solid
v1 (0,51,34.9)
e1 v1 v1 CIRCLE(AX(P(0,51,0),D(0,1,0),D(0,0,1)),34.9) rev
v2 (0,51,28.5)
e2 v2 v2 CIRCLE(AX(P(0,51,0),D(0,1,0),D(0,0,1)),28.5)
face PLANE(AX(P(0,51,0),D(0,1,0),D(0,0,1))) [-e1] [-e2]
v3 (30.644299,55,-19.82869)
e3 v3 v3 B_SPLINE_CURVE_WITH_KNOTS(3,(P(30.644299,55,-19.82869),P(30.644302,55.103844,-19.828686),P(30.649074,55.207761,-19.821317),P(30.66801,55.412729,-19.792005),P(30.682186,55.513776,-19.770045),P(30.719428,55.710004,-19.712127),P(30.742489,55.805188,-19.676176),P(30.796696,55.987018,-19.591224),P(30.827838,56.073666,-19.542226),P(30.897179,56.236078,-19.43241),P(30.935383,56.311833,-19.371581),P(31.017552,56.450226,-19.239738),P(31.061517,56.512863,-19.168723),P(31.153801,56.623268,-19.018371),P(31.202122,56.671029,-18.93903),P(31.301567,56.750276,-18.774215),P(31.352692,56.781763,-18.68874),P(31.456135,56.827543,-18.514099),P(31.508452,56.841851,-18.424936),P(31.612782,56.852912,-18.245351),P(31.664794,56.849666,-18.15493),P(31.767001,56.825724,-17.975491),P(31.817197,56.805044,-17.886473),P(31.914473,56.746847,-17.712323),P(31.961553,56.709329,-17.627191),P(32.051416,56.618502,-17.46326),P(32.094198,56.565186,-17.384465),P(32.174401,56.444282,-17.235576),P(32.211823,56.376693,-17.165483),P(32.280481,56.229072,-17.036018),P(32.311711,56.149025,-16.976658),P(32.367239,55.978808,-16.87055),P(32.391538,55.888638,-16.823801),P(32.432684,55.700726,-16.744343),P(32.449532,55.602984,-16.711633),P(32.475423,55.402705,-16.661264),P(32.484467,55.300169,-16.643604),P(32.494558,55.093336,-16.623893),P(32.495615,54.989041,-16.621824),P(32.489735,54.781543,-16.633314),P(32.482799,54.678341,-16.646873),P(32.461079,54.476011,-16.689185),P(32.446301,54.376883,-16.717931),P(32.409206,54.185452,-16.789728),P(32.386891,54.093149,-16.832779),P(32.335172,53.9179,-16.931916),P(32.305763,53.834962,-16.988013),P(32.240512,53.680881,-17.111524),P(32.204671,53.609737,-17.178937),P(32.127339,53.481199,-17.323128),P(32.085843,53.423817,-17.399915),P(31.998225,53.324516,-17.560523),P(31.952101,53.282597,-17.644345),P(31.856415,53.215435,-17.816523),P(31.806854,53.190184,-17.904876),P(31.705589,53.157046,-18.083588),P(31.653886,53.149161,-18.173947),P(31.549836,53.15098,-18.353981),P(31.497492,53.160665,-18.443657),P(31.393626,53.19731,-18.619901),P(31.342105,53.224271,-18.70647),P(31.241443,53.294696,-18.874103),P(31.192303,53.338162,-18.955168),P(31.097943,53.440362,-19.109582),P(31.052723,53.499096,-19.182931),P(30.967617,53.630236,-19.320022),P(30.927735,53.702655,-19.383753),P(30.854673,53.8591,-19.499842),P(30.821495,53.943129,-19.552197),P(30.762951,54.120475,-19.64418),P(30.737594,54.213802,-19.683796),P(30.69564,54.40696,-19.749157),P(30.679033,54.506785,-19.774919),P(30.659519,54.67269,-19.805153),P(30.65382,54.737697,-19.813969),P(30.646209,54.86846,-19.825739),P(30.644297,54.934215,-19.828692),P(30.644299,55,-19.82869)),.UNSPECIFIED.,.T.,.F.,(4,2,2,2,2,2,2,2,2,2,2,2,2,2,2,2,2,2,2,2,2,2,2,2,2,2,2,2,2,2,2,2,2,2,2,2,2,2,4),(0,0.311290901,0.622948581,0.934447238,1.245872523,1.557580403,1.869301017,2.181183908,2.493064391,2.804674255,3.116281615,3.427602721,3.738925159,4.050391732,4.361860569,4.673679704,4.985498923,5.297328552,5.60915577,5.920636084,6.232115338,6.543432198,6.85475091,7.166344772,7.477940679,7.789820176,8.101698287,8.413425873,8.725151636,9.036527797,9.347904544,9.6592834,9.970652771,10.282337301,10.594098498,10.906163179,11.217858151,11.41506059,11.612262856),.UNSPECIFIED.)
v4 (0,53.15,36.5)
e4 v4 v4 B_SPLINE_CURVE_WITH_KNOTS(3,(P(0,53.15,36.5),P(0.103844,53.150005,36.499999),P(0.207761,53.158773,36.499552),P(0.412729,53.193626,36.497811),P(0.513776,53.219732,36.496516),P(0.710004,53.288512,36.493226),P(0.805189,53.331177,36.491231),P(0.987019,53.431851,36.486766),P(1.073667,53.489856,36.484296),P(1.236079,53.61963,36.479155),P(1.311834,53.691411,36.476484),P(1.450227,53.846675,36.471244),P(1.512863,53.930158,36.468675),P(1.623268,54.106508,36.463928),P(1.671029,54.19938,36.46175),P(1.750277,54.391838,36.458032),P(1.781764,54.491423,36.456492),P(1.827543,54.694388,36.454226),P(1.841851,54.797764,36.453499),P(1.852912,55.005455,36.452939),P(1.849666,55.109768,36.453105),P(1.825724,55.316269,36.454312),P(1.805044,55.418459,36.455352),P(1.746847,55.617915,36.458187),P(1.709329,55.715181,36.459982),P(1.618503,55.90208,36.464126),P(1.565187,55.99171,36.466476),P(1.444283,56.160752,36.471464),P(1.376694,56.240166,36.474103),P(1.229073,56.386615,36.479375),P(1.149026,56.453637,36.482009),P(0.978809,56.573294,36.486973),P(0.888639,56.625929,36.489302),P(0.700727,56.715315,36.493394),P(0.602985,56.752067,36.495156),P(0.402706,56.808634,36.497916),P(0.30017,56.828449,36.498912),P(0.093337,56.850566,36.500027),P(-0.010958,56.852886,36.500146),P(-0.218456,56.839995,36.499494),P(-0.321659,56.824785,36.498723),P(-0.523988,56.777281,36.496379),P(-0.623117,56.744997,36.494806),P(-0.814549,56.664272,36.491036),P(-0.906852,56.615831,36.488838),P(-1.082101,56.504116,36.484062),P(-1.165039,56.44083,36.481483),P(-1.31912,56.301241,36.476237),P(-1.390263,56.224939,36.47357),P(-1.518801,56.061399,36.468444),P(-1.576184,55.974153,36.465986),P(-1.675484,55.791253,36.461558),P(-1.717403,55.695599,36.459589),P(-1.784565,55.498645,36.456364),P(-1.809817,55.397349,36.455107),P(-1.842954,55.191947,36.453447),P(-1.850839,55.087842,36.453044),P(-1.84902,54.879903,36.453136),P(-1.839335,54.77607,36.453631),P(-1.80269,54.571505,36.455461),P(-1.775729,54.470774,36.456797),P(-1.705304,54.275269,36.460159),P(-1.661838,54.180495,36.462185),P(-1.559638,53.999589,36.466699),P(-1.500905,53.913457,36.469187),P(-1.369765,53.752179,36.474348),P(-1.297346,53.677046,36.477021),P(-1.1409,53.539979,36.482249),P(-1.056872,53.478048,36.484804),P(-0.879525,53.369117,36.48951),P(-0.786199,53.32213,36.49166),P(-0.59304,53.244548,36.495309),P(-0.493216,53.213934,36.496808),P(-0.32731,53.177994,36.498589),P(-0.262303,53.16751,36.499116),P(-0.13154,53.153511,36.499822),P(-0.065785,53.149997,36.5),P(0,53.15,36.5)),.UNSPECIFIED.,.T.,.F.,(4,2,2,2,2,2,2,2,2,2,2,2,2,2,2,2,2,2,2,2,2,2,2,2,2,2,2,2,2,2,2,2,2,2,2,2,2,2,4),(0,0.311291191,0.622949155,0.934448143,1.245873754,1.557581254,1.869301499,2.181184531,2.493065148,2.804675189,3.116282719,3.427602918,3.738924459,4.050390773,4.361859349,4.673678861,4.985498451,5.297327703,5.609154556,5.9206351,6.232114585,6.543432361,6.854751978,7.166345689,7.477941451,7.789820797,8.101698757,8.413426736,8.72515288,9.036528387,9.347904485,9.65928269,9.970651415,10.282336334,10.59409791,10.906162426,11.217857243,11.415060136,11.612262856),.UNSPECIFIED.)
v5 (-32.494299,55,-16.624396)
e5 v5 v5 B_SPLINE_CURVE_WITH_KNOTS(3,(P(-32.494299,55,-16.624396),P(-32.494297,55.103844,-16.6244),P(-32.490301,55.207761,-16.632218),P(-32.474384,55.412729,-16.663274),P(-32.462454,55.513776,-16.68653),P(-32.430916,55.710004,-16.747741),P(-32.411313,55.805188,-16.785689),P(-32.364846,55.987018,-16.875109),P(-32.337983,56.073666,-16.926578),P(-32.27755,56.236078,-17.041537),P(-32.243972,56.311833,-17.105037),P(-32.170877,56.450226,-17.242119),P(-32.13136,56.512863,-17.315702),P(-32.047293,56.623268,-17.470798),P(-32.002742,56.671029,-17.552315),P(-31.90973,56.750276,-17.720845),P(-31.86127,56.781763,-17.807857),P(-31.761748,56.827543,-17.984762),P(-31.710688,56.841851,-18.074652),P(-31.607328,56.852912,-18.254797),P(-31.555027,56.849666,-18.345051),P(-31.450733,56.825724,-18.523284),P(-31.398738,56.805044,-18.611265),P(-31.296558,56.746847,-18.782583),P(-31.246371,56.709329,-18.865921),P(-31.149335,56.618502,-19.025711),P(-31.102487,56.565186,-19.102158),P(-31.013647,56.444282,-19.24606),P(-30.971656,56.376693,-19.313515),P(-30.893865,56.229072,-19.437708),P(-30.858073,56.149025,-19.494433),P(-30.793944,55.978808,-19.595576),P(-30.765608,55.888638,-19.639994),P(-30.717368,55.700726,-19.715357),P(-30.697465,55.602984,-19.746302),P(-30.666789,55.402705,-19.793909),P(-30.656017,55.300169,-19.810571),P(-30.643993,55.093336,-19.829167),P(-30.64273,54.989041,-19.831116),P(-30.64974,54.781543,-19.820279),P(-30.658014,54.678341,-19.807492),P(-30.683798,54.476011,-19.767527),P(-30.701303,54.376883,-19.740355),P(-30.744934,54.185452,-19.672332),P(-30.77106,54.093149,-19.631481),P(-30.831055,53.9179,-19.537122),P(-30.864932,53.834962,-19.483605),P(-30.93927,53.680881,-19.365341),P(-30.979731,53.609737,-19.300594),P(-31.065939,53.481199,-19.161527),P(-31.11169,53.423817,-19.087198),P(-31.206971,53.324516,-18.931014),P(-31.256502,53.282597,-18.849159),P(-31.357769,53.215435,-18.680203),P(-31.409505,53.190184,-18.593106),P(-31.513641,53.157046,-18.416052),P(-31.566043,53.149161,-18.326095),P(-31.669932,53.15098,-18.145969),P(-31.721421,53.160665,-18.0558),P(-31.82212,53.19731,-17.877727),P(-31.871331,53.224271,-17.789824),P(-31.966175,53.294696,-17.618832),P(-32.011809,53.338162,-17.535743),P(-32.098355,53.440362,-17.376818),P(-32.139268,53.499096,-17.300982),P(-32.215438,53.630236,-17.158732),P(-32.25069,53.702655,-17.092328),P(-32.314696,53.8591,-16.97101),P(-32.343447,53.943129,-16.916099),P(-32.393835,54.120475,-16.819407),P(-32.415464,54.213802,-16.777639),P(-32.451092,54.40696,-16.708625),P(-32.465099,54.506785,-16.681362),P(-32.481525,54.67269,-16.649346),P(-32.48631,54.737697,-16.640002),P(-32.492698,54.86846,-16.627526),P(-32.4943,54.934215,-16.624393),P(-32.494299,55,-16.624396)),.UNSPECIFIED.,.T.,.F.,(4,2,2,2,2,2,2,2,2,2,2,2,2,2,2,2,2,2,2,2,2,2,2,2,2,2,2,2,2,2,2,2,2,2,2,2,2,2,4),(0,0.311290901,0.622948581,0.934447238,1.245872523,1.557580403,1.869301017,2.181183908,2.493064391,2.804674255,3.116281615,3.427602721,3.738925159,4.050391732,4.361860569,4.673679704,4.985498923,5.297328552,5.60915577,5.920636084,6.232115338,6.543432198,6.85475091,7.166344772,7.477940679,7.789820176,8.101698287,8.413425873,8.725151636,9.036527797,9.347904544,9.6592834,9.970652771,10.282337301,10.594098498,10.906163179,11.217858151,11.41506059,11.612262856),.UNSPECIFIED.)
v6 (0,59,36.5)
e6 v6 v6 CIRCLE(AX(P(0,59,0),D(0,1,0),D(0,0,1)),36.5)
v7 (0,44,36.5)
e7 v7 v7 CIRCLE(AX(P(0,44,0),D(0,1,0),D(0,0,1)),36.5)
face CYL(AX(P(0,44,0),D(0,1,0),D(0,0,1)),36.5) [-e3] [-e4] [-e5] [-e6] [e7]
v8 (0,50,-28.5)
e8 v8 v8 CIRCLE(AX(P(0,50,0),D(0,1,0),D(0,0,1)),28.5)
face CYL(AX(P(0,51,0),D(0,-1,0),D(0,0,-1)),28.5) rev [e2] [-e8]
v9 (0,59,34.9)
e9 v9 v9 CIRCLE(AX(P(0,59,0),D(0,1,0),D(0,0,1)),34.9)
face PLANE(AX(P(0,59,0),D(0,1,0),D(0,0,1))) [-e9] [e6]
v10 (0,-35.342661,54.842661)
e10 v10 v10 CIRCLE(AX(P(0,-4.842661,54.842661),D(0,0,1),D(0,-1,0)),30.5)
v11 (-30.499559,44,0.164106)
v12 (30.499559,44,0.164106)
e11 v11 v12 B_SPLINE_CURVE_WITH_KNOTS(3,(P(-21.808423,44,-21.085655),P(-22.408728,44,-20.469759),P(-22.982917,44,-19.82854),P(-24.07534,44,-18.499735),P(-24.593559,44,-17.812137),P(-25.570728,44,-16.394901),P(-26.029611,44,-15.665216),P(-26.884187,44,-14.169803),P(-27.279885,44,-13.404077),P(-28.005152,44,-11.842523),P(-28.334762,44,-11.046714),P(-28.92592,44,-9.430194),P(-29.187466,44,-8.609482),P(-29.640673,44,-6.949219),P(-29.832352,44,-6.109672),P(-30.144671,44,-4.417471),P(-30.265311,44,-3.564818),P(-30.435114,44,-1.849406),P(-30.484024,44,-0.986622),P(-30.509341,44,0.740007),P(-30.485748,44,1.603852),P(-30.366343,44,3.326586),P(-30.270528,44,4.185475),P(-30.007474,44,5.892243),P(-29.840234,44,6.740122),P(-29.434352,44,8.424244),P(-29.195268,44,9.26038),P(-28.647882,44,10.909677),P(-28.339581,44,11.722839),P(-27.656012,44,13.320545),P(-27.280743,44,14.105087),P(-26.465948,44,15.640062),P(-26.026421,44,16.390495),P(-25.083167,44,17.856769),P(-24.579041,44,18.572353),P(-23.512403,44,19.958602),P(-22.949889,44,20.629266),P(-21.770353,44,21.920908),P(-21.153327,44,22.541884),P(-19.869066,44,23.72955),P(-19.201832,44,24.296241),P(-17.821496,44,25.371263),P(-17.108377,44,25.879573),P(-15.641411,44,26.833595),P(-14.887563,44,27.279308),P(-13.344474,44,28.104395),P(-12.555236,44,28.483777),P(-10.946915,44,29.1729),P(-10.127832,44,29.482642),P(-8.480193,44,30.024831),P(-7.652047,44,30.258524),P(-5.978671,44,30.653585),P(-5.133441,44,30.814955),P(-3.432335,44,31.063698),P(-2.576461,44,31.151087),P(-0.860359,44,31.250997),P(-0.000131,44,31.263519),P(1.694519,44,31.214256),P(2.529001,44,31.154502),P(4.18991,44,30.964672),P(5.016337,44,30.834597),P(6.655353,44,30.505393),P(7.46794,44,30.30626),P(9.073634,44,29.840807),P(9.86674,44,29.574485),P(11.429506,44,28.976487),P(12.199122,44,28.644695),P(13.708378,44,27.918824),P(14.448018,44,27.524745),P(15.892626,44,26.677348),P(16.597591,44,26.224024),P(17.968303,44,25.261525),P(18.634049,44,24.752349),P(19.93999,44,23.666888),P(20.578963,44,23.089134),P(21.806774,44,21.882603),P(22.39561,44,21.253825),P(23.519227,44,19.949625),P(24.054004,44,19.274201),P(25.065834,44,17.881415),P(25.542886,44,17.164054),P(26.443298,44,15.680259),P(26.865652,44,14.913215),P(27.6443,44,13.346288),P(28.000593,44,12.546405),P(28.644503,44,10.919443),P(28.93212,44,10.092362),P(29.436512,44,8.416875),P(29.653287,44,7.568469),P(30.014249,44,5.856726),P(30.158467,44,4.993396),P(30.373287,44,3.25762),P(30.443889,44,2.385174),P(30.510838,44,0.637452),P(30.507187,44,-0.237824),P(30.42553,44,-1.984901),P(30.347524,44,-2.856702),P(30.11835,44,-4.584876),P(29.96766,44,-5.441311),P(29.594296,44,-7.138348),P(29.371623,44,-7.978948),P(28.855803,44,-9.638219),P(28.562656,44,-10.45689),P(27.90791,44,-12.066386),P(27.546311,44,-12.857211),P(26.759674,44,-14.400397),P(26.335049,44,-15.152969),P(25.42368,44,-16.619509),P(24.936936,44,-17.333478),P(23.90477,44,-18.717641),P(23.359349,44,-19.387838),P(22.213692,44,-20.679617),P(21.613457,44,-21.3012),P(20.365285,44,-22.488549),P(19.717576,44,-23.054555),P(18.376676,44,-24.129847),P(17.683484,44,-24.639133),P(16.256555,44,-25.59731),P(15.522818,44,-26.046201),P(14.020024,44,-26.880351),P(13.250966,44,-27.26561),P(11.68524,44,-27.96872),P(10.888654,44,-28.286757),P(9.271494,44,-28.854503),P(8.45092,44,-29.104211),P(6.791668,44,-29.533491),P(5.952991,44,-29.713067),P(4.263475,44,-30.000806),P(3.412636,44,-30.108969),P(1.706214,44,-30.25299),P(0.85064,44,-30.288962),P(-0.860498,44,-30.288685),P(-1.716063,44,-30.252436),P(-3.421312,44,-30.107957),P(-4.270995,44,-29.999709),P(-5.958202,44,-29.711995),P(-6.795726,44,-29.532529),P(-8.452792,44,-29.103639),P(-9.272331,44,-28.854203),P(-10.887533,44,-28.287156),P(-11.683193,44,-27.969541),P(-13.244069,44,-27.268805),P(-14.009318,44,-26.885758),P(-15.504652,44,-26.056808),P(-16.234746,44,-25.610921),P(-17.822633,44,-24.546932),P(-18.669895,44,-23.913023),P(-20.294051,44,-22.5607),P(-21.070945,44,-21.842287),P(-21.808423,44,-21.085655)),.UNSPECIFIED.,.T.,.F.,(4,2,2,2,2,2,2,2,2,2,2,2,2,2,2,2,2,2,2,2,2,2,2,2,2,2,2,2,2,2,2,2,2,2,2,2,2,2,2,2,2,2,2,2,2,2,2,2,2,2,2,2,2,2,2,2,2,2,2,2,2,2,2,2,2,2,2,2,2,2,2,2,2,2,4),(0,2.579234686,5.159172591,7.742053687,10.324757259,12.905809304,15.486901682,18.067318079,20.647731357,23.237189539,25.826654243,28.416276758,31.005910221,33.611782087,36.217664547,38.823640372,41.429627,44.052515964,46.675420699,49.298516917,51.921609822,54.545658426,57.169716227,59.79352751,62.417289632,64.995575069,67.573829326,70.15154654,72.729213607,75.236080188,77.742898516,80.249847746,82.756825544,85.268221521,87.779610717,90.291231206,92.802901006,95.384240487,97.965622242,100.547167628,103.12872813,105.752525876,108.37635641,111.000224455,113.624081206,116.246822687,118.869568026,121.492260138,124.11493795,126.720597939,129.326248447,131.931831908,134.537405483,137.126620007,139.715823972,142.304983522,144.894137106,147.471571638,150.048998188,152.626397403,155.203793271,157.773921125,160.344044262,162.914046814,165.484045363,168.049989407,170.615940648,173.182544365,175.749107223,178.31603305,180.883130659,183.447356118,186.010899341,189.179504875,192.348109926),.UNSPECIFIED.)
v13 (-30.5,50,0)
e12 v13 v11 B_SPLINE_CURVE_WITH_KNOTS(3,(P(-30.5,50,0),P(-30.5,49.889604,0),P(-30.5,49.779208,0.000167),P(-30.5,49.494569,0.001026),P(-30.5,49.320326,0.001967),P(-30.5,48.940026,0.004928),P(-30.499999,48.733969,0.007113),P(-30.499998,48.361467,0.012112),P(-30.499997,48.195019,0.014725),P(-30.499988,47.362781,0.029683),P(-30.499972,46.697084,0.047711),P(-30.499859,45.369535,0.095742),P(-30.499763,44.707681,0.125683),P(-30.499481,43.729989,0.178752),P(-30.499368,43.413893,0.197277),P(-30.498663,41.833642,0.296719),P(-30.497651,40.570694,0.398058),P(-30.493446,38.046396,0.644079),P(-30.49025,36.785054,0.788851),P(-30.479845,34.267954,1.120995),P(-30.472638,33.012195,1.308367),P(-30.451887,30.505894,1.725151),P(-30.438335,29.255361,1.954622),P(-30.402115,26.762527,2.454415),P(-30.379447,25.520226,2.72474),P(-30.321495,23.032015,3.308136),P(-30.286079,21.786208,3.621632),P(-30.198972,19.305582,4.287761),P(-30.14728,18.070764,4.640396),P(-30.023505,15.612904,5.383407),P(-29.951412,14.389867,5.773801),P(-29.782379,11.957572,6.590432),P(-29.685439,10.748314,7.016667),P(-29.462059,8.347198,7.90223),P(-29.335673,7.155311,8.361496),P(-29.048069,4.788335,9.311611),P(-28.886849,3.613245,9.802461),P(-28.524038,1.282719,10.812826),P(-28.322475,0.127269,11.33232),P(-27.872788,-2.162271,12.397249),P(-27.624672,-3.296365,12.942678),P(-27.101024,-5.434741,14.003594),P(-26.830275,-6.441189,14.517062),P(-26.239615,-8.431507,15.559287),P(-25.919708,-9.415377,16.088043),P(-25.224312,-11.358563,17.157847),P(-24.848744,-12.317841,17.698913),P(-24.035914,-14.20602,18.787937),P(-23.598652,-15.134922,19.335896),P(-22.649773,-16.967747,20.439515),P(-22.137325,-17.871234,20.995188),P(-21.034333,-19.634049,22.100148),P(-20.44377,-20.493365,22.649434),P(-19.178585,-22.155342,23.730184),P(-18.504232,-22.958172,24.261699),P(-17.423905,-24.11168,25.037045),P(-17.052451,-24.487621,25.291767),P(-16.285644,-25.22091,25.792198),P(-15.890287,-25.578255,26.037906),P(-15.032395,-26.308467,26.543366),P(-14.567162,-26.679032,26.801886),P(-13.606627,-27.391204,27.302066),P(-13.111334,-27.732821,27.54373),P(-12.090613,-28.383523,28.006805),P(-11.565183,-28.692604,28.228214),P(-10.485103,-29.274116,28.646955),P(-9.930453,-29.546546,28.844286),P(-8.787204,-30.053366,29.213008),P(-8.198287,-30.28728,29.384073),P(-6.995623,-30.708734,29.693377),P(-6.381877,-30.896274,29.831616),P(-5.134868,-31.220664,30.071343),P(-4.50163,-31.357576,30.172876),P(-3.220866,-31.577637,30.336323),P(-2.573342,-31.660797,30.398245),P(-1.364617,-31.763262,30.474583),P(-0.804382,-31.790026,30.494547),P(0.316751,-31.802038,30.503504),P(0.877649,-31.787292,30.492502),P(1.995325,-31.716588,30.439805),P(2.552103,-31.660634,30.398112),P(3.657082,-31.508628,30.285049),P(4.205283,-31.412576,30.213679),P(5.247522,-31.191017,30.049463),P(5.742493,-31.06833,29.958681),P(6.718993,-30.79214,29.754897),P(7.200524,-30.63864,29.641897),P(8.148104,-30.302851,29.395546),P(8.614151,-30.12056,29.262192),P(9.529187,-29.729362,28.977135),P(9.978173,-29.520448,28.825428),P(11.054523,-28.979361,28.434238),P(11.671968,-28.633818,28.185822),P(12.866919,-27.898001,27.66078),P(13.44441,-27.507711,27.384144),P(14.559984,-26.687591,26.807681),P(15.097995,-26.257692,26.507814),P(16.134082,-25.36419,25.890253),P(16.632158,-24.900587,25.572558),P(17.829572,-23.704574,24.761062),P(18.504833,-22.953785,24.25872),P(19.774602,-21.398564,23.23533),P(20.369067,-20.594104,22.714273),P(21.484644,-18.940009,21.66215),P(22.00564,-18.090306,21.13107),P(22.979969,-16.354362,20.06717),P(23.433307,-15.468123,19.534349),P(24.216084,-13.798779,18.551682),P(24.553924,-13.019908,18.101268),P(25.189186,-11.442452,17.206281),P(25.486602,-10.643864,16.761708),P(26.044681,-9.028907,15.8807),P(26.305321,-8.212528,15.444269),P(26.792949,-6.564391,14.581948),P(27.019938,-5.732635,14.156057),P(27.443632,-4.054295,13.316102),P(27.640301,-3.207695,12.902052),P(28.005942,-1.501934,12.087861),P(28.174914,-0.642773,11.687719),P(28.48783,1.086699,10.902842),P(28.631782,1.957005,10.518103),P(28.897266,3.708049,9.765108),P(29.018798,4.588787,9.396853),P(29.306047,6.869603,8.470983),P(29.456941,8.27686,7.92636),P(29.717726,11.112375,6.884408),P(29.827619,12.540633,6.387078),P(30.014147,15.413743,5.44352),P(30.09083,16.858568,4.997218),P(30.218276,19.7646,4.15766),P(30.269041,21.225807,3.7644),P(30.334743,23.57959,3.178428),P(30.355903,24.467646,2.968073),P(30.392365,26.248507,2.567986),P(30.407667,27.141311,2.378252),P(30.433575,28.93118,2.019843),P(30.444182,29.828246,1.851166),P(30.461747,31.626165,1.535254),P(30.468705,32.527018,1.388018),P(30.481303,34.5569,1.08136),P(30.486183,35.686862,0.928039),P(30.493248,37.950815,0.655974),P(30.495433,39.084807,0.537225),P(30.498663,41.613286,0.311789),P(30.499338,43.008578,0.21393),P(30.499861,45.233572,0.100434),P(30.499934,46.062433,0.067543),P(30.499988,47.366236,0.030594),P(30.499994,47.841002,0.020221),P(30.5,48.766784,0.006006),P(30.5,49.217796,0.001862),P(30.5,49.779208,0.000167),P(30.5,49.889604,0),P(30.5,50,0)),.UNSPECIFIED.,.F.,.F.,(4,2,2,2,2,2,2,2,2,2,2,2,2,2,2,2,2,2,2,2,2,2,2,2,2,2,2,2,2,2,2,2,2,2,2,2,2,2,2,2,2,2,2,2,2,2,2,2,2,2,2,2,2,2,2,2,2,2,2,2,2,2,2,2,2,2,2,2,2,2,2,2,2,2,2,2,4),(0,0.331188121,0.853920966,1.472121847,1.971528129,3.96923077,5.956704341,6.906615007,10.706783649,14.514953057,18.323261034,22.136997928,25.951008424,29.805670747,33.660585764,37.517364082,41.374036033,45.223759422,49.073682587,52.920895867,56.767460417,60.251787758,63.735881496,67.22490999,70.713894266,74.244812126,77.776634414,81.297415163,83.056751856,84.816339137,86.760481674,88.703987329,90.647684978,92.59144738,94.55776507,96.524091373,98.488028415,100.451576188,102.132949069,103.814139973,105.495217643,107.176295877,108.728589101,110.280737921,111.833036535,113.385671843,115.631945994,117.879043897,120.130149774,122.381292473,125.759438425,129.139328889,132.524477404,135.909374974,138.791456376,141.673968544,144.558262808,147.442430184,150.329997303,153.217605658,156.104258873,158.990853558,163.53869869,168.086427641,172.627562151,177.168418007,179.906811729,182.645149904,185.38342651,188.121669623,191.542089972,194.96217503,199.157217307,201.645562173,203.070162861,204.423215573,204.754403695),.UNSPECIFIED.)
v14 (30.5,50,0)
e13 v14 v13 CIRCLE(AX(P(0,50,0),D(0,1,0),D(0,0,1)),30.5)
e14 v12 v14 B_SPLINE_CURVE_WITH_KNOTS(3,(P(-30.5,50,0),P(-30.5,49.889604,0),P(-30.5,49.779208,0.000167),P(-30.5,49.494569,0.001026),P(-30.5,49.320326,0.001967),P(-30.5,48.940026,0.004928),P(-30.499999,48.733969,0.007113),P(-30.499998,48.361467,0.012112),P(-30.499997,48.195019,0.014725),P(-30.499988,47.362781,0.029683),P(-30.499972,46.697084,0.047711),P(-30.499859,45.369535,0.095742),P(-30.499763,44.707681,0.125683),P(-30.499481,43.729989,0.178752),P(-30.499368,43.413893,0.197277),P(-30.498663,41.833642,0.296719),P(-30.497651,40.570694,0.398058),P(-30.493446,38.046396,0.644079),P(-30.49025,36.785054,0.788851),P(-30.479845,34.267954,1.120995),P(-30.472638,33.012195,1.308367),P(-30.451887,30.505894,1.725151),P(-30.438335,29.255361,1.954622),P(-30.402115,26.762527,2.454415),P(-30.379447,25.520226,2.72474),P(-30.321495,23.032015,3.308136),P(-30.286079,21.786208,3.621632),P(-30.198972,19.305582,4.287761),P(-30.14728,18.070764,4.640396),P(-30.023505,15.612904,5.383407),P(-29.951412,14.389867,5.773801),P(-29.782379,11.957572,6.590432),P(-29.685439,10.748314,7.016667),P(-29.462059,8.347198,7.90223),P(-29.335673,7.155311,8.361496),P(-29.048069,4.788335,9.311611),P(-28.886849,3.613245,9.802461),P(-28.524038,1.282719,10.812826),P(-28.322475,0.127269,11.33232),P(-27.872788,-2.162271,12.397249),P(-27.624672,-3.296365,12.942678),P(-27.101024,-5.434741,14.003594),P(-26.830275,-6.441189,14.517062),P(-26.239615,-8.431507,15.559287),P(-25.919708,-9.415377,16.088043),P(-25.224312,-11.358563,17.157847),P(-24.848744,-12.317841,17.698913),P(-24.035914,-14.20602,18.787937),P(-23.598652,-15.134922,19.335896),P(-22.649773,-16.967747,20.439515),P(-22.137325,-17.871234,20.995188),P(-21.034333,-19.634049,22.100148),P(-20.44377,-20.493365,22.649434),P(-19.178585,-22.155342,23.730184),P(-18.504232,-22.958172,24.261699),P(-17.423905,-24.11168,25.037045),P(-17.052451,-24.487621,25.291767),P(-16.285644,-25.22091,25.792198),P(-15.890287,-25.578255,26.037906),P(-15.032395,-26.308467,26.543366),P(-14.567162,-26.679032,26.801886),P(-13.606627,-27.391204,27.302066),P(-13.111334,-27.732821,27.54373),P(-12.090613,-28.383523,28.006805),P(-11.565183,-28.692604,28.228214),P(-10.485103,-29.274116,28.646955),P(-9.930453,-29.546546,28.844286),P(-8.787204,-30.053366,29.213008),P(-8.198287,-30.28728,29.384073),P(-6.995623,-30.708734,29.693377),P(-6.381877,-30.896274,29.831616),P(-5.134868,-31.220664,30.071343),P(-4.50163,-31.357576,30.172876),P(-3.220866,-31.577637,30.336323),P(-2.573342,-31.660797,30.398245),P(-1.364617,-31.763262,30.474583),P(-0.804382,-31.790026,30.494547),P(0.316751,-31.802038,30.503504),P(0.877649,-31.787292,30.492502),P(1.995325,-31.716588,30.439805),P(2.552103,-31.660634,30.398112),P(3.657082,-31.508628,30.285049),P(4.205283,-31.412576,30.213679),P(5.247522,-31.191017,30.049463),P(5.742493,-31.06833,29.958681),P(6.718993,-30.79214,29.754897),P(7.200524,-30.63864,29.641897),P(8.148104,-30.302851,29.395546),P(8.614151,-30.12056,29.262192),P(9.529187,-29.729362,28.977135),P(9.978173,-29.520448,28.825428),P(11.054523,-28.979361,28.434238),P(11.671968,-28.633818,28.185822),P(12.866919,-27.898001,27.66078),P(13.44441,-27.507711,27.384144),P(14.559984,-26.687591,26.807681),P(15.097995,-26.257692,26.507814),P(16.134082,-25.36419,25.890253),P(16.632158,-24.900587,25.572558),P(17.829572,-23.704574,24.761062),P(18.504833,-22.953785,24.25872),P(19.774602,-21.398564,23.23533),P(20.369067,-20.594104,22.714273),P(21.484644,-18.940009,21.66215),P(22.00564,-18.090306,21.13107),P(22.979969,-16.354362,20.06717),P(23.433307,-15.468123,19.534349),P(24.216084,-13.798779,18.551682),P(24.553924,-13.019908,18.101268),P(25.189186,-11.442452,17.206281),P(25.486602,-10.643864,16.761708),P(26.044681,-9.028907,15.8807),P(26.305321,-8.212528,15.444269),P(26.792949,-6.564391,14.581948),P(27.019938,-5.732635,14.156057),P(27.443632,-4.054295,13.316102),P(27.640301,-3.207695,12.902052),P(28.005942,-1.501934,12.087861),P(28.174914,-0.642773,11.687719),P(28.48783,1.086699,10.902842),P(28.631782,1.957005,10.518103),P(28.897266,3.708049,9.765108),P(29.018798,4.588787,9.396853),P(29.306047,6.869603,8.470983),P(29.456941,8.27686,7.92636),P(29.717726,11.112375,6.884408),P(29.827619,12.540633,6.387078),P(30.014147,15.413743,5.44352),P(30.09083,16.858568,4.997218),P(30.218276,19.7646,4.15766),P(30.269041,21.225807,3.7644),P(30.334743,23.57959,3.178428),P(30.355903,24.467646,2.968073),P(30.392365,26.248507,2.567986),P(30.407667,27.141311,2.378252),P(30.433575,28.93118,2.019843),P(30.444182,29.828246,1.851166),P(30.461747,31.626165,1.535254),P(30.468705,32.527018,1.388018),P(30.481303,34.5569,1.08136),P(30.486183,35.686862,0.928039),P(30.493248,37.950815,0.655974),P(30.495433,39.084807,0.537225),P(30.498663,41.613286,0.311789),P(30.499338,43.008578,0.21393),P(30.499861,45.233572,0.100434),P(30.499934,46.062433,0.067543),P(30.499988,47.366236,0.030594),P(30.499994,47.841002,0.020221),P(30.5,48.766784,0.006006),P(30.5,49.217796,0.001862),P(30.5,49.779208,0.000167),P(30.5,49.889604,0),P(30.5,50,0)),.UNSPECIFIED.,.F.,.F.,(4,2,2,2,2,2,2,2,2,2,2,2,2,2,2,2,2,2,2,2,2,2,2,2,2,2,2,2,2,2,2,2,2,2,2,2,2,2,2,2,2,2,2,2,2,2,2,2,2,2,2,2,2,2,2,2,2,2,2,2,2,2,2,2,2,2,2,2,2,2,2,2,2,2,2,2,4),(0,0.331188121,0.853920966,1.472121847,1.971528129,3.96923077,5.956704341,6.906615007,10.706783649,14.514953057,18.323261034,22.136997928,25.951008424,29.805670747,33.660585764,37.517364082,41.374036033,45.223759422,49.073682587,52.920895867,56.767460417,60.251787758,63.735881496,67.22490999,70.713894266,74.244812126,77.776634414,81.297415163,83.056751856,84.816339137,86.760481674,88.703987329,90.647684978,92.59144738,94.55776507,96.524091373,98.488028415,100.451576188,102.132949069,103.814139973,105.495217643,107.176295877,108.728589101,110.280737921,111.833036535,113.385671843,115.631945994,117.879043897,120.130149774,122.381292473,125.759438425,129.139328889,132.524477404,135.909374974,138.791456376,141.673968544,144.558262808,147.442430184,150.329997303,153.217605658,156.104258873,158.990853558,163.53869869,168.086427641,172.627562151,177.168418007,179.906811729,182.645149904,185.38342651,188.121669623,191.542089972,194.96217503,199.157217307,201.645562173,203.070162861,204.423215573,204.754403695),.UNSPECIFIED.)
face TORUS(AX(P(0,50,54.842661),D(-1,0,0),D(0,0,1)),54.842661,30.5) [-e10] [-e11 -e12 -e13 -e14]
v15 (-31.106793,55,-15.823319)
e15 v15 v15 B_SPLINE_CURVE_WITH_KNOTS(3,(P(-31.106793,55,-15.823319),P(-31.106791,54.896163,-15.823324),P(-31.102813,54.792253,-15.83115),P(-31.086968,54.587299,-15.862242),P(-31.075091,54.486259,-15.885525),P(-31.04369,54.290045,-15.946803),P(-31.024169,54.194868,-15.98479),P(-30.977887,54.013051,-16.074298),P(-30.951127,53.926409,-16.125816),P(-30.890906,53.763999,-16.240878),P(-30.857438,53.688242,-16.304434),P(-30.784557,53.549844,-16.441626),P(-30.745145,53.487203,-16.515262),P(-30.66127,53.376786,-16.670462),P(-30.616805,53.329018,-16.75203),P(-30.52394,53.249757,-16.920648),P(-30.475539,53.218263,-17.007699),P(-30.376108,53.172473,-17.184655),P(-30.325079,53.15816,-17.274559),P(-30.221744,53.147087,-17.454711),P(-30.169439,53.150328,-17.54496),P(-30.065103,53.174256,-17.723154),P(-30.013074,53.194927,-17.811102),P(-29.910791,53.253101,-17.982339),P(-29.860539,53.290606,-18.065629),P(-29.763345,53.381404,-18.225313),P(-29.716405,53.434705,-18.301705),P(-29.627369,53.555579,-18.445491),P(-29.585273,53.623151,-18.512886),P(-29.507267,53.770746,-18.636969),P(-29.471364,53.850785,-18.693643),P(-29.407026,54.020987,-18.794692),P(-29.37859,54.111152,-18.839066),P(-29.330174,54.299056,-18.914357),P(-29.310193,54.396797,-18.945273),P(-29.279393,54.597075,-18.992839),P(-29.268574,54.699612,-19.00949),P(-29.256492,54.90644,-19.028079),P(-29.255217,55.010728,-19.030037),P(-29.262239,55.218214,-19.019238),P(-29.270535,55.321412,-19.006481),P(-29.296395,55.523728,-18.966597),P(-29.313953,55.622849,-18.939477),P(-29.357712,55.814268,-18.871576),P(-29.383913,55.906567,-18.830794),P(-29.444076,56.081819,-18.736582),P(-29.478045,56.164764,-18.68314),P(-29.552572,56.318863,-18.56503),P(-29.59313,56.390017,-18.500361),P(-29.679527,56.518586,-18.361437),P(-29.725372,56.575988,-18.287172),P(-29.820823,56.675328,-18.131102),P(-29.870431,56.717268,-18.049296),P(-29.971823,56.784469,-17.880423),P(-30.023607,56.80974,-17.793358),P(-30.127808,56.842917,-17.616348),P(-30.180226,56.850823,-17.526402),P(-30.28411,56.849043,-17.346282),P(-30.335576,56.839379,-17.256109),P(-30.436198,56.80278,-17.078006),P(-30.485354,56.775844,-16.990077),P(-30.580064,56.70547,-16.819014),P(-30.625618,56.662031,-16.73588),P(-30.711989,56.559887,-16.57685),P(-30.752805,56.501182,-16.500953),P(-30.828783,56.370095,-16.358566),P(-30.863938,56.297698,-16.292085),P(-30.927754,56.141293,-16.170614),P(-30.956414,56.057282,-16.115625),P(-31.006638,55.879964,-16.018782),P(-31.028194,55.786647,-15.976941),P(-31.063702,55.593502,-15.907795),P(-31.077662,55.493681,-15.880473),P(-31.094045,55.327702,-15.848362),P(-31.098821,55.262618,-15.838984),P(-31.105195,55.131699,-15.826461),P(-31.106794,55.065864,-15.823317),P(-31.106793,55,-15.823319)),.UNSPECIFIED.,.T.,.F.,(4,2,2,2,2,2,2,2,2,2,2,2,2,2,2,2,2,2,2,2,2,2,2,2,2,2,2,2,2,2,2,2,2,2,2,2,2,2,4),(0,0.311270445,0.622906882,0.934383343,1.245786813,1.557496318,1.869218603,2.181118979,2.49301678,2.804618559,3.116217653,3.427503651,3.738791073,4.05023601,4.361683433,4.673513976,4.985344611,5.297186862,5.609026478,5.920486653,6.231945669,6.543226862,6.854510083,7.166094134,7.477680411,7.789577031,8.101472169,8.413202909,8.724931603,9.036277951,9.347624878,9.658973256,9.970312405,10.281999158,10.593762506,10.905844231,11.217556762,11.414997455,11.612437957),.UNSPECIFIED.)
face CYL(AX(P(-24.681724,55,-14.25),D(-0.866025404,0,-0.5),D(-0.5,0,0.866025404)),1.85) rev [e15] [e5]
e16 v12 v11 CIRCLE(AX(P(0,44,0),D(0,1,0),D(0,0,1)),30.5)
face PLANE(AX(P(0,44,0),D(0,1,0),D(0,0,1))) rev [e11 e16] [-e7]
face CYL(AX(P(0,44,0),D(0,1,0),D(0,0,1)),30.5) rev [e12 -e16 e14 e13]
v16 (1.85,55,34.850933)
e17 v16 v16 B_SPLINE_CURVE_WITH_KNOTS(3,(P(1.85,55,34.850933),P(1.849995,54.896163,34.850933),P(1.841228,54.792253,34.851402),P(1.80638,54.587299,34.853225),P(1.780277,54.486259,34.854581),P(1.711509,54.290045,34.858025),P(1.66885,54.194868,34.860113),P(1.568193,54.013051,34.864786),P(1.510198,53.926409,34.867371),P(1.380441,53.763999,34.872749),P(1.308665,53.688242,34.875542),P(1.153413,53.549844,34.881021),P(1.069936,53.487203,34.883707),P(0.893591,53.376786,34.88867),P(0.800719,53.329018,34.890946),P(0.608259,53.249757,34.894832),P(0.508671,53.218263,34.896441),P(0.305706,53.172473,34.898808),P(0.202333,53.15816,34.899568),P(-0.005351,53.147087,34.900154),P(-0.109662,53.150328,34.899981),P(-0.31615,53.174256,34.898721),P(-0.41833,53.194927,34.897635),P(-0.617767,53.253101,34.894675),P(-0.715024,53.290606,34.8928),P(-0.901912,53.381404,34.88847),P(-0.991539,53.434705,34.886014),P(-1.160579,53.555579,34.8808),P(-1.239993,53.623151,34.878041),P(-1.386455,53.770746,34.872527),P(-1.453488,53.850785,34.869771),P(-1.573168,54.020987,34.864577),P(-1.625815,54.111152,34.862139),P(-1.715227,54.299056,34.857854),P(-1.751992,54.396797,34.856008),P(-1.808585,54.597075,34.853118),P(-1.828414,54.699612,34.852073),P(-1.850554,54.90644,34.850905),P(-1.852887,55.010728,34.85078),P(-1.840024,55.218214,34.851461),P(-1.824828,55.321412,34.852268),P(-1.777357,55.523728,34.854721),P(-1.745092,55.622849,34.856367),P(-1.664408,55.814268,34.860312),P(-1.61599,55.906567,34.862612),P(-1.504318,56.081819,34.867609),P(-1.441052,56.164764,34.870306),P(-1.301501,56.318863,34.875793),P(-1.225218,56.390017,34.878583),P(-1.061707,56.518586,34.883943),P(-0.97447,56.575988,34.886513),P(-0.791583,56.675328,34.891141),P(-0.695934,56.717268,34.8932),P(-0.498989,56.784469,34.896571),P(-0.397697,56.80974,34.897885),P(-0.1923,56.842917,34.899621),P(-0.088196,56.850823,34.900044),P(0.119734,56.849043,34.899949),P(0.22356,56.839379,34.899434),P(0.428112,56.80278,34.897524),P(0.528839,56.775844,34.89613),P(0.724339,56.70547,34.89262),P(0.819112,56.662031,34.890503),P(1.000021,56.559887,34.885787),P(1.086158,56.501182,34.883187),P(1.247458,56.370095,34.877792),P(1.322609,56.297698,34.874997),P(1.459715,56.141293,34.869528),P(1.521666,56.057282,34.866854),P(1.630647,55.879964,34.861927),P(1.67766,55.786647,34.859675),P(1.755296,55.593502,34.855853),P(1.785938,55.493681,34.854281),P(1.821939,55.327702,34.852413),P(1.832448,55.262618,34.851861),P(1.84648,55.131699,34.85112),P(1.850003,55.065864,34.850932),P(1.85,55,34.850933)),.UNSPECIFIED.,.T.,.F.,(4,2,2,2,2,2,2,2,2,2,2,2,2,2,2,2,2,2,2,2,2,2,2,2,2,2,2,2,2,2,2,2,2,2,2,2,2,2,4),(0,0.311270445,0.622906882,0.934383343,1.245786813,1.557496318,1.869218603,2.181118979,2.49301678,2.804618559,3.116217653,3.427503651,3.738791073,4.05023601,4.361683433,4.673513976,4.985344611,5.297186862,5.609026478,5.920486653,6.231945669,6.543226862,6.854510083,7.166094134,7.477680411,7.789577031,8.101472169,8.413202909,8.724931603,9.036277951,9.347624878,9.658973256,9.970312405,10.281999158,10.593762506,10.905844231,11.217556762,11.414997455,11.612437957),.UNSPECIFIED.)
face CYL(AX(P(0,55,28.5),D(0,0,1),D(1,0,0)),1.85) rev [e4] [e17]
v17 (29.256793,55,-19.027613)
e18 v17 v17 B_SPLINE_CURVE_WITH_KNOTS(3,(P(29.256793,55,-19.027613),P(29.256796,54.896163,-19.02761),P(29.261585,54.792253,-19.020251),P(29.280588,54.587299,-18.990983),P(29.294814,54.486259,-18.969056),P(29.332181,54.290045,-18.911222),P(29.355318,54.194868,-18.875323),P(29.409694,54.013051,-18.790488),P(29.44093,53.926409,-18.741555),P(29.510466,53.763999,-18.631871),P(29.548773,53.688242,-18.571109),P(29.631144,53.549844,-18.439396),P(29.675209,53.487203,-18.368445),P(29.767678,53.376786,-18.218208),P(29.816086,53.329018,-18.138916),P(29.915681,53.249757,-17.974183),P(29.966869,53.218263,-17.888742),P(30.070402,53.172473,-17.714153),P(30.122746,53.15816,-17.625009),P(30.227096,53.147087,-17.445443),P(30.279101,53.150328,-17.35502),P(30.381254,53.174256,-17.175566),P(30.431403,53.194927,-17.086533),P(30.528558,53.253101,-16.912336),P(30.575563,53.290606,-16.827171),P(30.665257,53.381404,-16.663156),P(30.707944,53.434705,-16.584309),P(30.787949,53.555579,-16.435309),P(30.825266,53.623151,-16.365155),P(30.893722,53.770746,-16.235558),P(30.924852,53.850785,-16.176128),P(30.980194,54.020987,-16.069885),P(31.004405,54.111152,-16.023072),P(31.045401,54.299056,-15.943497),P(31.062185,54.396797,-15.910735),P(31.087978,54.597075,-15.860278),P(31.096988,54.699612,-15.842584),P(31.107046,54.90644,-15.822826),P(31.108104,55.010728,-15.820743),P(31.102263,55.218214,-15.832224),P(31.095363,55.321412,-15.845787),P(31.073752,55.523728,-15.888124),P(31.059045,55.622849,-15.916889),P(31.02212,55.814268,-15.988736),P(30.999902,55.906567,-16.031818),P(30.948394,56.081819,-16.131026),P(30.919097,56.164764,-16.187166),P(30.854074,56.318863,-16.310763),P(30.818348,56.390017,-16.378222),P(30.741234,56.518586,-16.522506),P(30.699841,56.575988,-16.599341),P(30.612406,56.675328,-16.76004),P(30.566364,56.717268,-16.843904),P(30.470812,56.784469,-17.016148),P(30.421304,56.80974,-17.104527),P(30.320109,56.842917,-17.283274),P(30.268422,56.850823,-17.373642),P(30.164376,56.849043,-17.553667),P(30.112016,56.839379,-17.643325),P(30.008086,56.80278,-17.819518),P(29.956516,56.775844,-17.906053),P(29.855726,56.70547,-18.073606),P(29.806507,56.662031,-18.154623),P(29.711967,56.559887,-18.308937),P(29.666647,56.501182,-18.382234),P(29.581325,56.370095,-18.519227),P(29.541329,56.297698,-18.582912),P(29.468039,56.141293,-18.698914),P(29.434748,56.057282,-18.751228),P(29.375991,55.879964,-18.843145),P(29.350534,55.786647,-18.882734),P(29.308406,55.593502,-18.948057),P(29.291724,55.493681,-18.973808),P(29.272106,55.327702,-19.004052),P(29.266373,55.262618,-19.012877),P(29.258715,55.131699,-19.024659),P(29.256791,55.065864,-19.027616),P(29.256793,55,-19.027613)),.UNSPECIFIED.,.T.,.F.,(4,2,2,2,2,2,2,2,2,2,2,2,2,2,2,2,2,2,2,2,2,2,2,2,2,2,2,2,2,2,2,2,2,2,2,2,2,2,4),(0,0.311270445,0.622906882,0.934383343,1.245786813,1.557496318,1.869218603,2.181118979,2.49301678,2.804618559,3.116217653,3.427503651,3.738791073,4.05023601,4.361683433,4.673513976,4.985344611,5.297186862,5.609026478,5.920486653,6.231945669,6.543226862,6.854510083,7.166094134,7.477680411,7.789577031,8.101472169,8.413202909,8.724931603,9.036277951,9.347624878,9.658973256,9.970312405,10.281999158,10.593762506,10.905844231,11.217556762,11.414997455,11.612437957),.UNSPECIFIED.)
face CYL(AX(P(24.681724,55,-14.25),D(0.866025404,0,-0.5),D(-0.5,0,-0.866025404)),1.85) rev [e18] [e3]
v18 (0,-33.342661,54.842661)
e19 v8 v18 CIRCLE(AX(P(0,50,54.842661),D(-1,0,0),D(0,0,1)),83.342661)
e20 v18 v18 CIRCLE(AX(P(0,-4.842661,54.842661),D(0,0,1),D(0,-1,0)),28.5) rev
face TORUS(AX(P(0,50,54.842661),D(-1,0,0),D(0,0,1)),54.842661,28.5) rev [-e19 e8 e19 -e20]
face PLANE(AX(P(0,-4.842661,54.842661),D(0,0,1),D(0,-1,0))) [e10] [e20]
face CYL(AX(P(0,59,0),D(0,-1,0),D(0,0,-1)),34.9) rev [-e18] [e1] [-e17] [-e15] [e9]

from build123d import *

# Parameters (mm, degrees)
SKETCH2_R           = 30.5
SKETCH2_R_2         = 28.5
BOSS_EXTRUDE2_DEPTH = 1
SKETCH7_R           = 36.5
SKETCH7_R_2         = 30.5
SKETCH7_R_3         = 34.9
BOSS_EXTRUDE3_DEPTH = 7
SKETCH7_3_R         = 36.5
SKETCH7_3_R_2       = 34.9
BOSS_EXTRUDE5_DEPTH = 8
SKETCH14_R          = 1.85
CUT_EXTRUDE1_DEPTH  = 8
CIRPATTERN1_COUNT   = 3
SWEEP1_OUTLINE_R    = 30.5
SWEEP1_OUTLINE_R_2  = 28.5
SWEEP1_ANGLE        = 90


# Read off the part's stored shape, not the designer's step: Sweep1
with BuildPart() as part:
    # Sketch2 → Boss-Extrude2 (new body)
    with BuildSketch(Plane(origin=(0, 50, 0), x_dir=(1, 0, 0), z_dir=(0, 1, 0))):
        with Locations(Location((0, 0, 0), (0, 0, 270))):
            Circle(SKETCH2_R)
        with Locations(Location((0, 0, 0), (0, 0, 270))):
            Circle(SKETCH2_R_2, mode=Mode.SUBTRACT)
    extrude(amount=BOSS_EXTRUDE2_DEPTH)



with BuildPart() as body_2:
    # Sketch7 → Boss-Extrude3 (new body)
    # profile 1 of 2: a face of its own
    with BuildSketch(Plane(origin=(0, 51, 0), x_dir=(1, 0, 0), z_dir=(0, 1, 0))):
        with Locations(Location((0, 0, 0), (0, 0, 270))):
            Circle(SKETCH7_R)
        with Locations(Location((0, 0, 0), (0, 0, 270))):
            Circle(SKETCH7_R_2, mode=Mode.SUBTRACT)
    # profile 2 of 2: a face of its own
    with BuildSketch(Plane(origin=(0, 51, 0), x_dir=(1, 0, 0), z_dir=(0, 1, 0))):
        with Locations(Location((0, 0, 0), (0, 0, 270))):
            Circle(SKETCH7_R)
        Circle(SKETCH7_R_3, mode=Mode.SUBTRACT)
    extrude(amount=-BOSS_EXTRUDE3_DEPTH)


with BuildPart() as part_1:
    add(part.part)

    add(body_2.part)  # Boss-Extrude5 merges body 2
    # Sketch7<3> → Boss-Extrude5 (add)
    with BuildSketch(Plane(origin=(0, 51, 0), x_dir=(1, 0, 0), z_dir=(0, 1, 0))):
        with Locations(Location((0, 0, 0), (0, 0, 270))):
            Circle(SKETCH7_3_R)
        with Locations(Location((0, 0, 0), (0, 0, 270))):
            Circle(SKETCH7_3_R_2, mode=Mode.SUBTRACT)
    extrude(amount=BOSS_EXTRUDE5_DEPTH)

    # Sketch14 → Cut-Extrude1 (cut)
    with BuildSketch(Plane.XY.offset(36.5)):
        with Locations(Location((0, 55, 0), (0, 0, 270))):
            Circle(SKETCH14_R)
    cut_extrude1 = extrude(amount=-CUT_EXTRUDE1_DEPTH, mode=Mode.SUBTRACT)

    # CirPattern1: Cut-Extrude1 ×3 about axis
    cirpattern1_axis = Axis((0, 0, 0), (0, 1, 0))
    for i in range(1, CIRPATTERN1_COUNT):
        add(cut_extrude1.rotate(cirpattern1_axis, i * 360 / CIRPATTERN1_COUNT), mode=Mode.SUBTRACT)

    # Sweep1 outline → Sweep1 (revolve)
    with BuildSketch(Plane(origin=(0, 50, 54.842660898), x_dir=(0, -1, 0), z_dir=(0, 0, 1))):
        with Locations((54.842660898, 0)):
            Circle(SWEEP1_OUTLINE_R)
        with Locations((54.842660898, 0)):
            Circle(SWEEP1_OUTLINE_R_2, mode=Mode.SUBTRACT)
    revolve(axis=Axis((0, 50, 54.842660898), (1, 0, 0)), revolution_arc=SWEEP1_ANGLE)


solid = part_1.part
